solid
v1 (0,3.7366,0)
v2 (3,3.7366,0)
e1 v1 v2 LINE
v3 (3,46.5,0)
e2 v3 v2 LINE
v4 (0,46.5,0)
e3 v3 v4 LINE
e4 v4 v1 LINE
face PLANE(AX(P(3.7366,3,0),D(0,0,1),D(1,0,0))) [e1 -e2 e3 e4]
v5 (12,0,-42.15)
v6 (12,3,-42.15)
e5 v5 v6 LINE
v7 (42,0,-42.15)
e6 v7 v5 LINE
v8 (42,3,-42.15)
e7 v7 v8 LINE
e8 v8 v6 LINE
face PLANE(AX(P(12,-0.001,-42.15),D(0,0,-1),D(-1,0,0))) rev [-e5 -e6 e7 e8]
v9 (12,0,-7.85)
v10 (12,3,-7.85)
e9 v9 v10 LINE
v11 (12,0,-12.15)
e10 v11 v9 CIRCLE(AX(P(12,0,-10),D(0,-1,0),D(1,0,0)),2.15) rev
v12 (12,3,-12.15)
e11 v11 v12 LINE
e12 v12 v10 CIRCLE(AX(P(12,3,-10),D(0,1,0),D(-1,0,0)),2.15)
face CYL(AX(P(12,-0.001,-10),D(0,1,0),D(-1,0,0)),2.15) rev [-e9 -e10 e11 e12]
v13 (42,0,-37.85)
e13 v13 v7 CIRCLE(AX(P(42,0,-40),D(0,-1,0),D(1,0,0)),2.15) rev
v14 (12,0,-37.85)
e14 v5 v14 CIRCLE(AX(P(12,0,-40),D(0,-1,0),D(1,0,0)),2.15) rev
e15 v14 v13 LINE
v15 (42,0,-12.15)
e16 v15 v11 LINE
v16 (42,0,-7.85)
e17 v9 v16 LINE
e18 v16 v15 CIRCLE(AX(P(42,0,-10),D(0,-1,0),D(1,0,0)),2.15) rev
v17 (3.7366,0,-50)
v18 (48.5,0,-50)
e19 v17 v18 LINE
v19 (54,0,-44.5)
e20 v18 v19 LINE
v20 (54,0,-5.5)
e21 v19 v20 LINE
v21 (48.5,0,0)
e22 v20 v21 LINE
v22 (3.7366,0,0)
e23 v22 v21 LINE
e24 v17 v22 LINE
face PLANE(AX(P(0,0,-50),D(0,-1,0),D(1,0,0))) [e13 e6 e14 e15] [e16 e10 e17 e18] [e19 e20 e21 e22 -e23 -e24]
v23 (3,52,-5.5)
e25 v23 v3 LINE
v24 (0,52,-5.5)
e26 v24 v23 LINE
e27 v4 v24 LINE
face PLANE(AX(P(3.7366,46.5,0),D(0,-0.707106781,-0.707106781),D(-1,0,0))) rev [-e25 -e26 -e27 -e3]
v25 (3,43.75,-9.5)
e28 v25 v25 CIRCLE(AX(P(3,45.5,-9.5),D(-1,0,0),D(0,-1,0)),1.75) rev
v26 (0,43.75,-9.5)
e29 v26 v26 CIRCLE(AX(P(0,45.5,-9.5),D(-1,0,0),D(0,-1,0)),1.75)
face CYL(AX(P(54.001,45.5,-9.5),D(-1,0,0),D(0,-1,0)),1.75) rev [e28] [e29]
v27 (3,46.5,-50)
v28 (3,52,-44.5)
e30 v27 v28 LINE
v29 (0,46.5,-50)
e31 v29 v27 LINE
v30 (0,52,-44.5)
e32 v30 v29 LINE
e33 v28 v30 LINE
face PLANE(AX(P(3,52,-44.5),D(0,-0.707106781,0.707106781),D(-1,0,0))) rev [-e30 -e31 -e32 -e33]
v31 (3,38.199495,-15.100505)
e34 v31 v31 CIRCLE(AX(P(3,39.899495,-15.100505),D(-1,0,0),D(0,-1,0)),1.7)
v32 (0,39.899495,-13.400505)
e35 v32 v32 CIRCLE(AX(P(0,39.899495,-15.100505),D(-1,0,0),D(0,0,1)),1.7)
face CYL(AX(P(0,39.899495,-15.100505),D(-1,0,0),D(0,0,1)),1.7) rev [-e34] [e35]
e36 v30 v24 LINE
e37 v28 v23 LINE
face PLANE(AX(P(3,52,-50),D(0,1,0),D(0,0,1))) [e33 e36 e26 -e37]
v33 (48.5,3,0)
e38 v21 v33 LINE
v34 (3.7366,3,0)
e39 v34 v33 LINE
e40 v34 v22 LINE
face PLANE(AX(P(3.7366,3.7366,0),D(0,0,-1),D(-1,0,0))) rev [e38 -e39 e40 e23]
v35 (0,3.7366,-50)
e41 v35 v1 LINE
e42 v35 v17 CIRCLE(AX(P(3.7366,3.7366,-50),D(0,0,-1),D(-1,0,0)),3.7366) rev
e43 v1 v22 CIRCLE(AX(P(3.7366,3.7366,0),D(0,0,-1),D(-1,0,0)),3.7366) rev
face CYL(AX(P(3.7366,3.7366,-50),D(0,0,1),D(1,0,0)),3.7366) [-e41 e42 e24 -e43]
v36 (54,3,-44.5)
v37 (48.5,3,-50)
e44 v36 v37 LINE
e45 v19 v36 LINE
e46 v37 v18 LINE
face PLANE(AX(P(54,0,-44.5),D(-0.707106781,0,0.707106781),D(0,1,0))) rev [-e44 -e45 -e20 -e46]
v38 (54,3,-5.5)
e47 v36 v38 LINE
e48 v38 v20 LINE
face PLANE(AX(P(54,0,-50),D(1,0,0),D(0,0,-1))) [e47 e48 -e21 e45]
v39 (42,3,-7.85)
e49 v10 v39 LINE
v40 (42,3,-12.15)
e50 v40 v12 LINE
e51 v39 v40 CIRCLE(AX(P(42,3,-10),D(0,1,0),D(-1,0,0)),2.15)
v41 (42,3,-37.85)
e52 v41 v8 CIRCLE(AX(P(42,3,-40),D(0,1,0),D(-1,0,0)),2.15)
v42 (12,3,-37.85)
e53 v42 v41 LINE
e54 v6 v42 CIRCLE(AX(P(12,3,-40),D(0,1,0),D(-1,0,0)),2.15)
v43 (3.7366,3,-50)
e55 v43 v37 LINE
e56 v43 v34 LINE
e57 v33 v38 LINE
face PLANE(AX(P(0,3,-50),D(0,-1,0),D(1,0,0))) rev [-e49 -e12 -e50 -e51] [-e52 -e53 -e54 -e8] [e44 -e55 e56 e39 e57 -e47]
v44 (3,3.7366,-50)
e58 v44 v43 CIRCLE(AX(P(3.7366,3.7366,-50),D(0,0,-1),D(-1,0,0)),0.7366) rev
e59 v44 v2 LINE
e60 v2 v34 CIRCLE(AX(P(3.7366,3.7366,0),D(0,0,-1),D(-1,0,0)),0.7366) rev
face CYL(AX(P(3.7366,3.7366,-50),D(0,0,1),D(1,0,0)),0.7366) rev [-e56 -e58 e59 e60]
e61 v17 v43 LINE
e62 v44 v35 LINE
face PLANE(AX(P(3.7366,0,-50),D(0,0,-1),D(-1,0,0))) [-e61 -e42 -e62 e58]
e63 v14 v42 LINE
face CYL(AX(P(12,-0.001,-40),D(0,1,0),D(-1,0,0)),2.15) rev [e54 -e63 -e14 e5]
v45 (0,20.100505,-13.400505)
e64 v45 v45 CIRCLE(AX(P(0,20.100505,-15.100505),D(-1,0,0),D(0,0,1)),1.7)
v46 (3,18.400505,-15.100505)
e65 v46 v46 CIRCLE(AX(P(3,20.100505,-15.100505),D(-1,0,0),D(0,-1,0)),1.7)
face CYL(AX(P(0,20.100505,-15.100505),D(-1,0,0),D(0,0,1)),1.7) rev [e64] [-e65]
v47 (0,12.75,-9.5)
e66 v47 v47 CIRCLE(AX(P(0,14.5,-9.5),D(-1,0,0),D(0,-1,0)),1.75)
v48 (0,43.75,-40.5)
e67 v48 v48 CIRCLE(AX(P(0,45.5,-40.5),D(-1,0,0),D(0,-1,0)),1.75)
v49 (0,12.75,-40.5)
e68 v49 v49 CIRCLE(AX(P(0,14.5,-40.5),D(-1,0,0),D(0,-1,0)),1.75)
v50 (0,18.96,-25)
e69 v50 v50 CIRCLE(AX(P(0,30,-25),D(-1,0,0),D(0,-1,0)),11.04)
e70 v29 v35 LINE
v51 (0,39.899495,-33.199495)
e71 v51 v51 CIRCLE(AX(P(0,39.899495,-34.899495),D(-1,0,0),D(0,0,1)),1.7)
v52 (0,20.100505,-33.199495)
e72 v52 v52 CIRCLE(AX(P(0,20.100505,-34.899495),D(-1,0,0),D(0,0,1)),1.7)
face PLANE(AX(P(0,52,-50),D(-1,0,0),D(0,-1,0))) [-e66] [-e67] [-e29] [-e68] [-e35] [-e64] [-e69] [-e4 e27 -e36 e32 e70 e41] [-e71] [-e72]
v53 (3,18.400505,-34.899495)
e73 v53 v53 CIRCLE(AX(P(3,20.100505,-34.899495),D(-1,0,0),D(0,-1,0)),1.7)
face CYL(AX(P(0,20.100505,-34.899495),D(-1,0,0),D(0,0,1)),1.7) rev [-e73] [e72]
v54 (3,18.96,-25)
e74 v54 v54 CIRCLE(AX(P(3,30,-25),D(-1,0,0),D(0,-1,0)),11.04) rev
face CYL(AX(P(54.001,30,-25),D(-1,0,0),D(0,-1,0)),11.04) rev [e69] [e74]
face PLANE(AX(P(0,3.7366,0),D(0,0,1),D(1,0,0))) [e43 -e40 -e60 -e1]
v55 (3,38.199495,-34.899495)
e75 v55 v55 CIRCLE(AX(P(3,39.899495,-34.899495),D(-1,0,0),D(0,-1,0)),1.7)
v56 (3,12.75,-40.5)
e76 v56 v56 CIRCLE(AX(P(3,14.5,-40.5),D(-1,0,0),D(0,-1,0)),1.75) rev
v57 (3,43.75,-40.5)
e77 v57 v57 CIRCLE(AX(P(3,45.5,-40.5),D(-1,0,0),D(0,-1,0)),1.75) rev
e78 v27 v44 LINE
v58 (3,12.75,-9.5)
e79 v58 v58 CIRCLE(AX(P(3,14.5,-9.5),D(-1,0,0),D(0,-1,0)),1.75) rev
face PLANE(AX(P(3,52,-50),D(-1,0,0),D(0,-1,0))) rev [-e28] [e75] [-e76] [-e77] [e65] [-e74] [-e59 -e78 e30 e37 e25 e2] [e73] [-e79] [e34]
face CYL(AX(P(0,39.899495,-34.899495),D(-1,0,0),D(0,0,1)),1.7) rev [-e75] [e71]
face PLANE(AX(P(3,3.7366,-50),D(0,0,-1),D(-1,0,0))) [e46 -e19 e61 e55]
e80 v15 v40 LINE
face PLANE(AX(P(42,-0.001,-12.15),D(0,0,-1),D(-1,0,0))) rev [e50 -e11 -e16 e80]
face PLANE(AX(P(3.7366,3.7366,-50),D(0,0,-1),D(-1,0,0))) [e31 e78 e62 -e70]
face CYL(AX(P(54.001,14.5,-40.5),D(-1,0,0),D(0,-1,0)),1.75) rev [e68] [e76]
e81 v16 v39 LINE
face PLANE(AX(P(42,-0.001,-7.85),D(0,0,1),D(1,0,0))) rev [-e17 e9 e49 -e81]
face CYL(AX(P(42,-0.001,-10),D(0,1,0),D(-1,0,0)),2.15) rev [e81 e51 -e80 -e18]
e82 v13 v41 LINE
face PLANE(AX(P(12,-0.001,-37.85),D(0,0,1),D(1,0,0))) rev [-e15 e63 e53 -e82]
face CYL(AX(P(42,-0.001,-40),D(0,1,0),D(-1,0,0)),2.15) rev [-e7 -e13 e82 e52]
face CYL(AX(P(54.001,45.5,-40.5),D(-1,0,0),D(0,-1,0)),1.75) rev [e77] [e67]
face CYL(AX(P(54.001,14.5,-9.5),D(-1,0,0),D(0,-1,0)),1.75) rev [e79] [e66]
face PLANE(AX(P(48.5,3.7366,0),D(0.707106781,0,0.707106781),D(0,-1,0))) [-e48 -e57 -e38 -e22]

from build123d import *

# Parameters (mm, degrees)
BASE_FLANGE1_DEPTH           = 50
CUT_EXTRUDE1_REACH           = 92.111
SKETCH23_R                   = 11.04
SKETCH23_R_2                 = 1.75
CUT_EXTRUDE2_REACH           = 90.414
CHAMFER1_SIZE                = 5.5
TALADRO_DE_MARGEN_PARA_M31_D = 3.4
MATRIZC1_COUNT               = 4


# Sheet-metal steps are written as plain solids
with BuildPart() as part:
    # Sketch2 → Base-Flange1 (new body)
    with BuildSketch(Plane(origin=(0, 0, 0), x_dir=(-1, 0, 0), z_dir=(0, 0, -1))):
        with BuildLine():
            Line((0, 52), (0, 3.7366))
            ThreePointArc((0, 3.7366), (-1.094424801, 1.094424801), (-3.7366, 0))
            Line((-3.7366, 0), (-54, 0))
            Line((-54, 0), (-54, 3))
            Line((-54, 3), (-3.7366, 3))
            ThreePointArc((-3.7366, 3), (-3.215745145, 3.215745145), (-3, 3.7366))
            Line((-3, 3.7366), (-3, 52))
            Line((-3, 52), (0, 52))
        make_face()
    extrude(amount=BASE_FLANGE1_DEPTH)

    # Sketch23 → Cut-Extrude1 (cut, up to next)
    with BuildSketch(Plane.ZY, mode=Mode.PRIVATE) as cut_extrude1_sk1:
        with Locations(Location((-25, 30, 0), (0, 0, 270))):
            Circle(SKETCH23_R)
    cut_extrude1_tool1 = extrude(cut_extrude1_sk1.sketch, amount=-CUT_EXTRUDE1_REACH, mode=Mode.PRIVATE) & part.part
    # Sketch23 → Cut-Extrude1 (cut, up to next)
    with BuildSketch(Plane.ZY, mode=Mode.PRIVATE) as cut_extrude1_sk2:
        with Locations(Location((-9.5, 45.5, 0), (0, 0, 270))):
            Circle(SKETCH23_R_2)
    cut_extrude1_tool2 = extrude(cut_extrude1_sk2.sketch, amount=-CUT_EXTRUDE1_REACH, mode=Mode.PRIVATE) & part.part
    # Sketch23 → Cut-Extrude1 (cut, up to next)
    with BuildSketch(Plane.ZY, mode=Mode.PRIVATE) as cut_extrude1_sk3:
        with Locations(Location((-9.5, 14.5, 0), (0, 0, 270))):
            Circle(SKETCH23_R_2)
    cut_extrude1_tool3 = extrude(cut_extrude1_sk3.sketch, amount=-CUT_EXTRUDE1_REACH, mode=Mode.PRIVATE) & part.part
    # Sketch23 → Cut-Extrude1 (cut, up to next)
    with BuildSketch(Plane.ZY, mode=Mode.PRIVATE) as cut_extrude1_sk4:
        with Locations(Location((-40.5, 14.5, 0), (0, 0, 270))):
            Circle(SKETCH23_R_2)
    cut_extrude1_tool4 = extrude(cut_extrude1_sk4.sketch, amount=-CUT_EXTRUDE1_REACH, mode=Mode.PRIVATE) & part.part
    # Sketch23 → Cut-Extrude1 (cut, up to next)
    with BuildSketch(Plane.ZY, mode=Mode.PRIVATE) as cut_extrude1_sk5:
        with Locations(Location((-40.5, 45.5, 0), (0, 0, 270))):
            Circle(SKETCH23_R_2)
    cut_extrude1_tool5 = extrude(cut_extrude1_sk5.sketch, amount=-CUT_EXTRUDE1_REACH, mode=Mode.PRIVATE) & part.part
    add(cut_extrude1_tool1.solids().sort_by_distance((0, 30, -25))[0], mode=Mode.SUBTRACT)
    add(cut_extrude1_tool2.solids().sort_by_distance((0, 45.5, -9.5))[0], mode=Mode.SUBTRACT)
    add(cut_extrude1_tool3.solids().sort_by_distance((0, 14.5, -9.5))[0], mode=Mode.SUBTRACT)
    add(cut_extrude1_tool4.solids().sort_by_distance((0, 14.5, -40.5))[0], mode=Mode.SUBTRACT)
    add(cut_extrude1_tool5.solids().sort_by_distance((0, 45.5, -40.5))[0], mode=Mode.SUBTRACT)

    # Sketch24 → Cut-Extrude2 (cut, up to next)
    with BuildSketch(Plane(origin=(0, 3, 0), x_dir=(1, 0, 0), z_dir=(0, 1, 0)), mode=Mode.PRIVATE) as cut_extrude2_sk1:
        with BuildLine():
            Line((42, 7.85), (12, 7.85))
            ThreePointArc((12, 7.85), (9.85, 10), (12, 12.15))
            Line((12, 12.15), (42, 12.15))
            ThreePointArc((42, 12.15), (44.15, 10), (42, 7.85))
        make_face()
    cut_extrude2_tool1 = extrude(cut_extrude2_sk1.sketch, amount=-CUT_EXTRUDE2_REACH, mode=Mode.PRIVATE) & part.part
    # Sketch24 → Cut-Extrude2 (cut, up to next)
    with BuildSketch(Plane(origin=(0, 3, 0), x_dir=(1, 0, 0), z_dir=(0, 1, 0)), mode=Mode.PRIVATE) as cut_extrude2_sk2:
        with BuildLine():
            Line((12, 42.15), (42, 42.15))
            ThreePointArc((42, 42.15), (44.15, 40), (42, 37.85))
            Line((42, 37.85), (12, 37.85))
            ThreePointArc((12, 37.85), (9.85, 40), (12, 42.15))
        make_face()
    cut_extrude2_tool2 = extrude(cut_extrude2_sk2.sketch, amount=-CUT_EXTRUDE2_REACH, mode=Mode.PRIVATE) & part.part
    add(cut_extrude2_tool1.solids().sort_by_distance((27, 3, -10))[0], mode=Mode.SUBTRACT)
    add(cut_extrude2_tool2.solids().sort_by_distance((27, 3, -40))[0], mode=Mode.SUBTRACT)

    # Chamfer1
    chamfer1_edges = [part.edges().sort_by_distance(p)[0] for p in [
        (1.5, 52, -50),
        (54, 1.5, -50),
        (1.5, 52, 0),
        (54, 1.5, 0),
    ]]
    chamfer(chamfer1_edges, length=CHAMFER1_SIZE)

    # Taladro de margen para M31 (through all)
    with Locations(Plane.ZY):
        with Locations((-15.100505063, 39.899494937)):
            taladro_de_margen_para_m31 = Hole(TALADRO_DE_MARGEN_PARA_M31_D / 2)

    # MatrizC1: Taladro de margen para M31 ×4 about axis
    matrizc1_axis = Axis((0, 30, -25), (1, 0, 0))
    for i in range(1, MATRIZC1_COUNT):
        add(taladro_de_margen_para_m31.rotate(matrizc1_axis, i * 360 / MATRIZC1_COUNT), mode=Mode.SUBTRACT)


solid = part.part
